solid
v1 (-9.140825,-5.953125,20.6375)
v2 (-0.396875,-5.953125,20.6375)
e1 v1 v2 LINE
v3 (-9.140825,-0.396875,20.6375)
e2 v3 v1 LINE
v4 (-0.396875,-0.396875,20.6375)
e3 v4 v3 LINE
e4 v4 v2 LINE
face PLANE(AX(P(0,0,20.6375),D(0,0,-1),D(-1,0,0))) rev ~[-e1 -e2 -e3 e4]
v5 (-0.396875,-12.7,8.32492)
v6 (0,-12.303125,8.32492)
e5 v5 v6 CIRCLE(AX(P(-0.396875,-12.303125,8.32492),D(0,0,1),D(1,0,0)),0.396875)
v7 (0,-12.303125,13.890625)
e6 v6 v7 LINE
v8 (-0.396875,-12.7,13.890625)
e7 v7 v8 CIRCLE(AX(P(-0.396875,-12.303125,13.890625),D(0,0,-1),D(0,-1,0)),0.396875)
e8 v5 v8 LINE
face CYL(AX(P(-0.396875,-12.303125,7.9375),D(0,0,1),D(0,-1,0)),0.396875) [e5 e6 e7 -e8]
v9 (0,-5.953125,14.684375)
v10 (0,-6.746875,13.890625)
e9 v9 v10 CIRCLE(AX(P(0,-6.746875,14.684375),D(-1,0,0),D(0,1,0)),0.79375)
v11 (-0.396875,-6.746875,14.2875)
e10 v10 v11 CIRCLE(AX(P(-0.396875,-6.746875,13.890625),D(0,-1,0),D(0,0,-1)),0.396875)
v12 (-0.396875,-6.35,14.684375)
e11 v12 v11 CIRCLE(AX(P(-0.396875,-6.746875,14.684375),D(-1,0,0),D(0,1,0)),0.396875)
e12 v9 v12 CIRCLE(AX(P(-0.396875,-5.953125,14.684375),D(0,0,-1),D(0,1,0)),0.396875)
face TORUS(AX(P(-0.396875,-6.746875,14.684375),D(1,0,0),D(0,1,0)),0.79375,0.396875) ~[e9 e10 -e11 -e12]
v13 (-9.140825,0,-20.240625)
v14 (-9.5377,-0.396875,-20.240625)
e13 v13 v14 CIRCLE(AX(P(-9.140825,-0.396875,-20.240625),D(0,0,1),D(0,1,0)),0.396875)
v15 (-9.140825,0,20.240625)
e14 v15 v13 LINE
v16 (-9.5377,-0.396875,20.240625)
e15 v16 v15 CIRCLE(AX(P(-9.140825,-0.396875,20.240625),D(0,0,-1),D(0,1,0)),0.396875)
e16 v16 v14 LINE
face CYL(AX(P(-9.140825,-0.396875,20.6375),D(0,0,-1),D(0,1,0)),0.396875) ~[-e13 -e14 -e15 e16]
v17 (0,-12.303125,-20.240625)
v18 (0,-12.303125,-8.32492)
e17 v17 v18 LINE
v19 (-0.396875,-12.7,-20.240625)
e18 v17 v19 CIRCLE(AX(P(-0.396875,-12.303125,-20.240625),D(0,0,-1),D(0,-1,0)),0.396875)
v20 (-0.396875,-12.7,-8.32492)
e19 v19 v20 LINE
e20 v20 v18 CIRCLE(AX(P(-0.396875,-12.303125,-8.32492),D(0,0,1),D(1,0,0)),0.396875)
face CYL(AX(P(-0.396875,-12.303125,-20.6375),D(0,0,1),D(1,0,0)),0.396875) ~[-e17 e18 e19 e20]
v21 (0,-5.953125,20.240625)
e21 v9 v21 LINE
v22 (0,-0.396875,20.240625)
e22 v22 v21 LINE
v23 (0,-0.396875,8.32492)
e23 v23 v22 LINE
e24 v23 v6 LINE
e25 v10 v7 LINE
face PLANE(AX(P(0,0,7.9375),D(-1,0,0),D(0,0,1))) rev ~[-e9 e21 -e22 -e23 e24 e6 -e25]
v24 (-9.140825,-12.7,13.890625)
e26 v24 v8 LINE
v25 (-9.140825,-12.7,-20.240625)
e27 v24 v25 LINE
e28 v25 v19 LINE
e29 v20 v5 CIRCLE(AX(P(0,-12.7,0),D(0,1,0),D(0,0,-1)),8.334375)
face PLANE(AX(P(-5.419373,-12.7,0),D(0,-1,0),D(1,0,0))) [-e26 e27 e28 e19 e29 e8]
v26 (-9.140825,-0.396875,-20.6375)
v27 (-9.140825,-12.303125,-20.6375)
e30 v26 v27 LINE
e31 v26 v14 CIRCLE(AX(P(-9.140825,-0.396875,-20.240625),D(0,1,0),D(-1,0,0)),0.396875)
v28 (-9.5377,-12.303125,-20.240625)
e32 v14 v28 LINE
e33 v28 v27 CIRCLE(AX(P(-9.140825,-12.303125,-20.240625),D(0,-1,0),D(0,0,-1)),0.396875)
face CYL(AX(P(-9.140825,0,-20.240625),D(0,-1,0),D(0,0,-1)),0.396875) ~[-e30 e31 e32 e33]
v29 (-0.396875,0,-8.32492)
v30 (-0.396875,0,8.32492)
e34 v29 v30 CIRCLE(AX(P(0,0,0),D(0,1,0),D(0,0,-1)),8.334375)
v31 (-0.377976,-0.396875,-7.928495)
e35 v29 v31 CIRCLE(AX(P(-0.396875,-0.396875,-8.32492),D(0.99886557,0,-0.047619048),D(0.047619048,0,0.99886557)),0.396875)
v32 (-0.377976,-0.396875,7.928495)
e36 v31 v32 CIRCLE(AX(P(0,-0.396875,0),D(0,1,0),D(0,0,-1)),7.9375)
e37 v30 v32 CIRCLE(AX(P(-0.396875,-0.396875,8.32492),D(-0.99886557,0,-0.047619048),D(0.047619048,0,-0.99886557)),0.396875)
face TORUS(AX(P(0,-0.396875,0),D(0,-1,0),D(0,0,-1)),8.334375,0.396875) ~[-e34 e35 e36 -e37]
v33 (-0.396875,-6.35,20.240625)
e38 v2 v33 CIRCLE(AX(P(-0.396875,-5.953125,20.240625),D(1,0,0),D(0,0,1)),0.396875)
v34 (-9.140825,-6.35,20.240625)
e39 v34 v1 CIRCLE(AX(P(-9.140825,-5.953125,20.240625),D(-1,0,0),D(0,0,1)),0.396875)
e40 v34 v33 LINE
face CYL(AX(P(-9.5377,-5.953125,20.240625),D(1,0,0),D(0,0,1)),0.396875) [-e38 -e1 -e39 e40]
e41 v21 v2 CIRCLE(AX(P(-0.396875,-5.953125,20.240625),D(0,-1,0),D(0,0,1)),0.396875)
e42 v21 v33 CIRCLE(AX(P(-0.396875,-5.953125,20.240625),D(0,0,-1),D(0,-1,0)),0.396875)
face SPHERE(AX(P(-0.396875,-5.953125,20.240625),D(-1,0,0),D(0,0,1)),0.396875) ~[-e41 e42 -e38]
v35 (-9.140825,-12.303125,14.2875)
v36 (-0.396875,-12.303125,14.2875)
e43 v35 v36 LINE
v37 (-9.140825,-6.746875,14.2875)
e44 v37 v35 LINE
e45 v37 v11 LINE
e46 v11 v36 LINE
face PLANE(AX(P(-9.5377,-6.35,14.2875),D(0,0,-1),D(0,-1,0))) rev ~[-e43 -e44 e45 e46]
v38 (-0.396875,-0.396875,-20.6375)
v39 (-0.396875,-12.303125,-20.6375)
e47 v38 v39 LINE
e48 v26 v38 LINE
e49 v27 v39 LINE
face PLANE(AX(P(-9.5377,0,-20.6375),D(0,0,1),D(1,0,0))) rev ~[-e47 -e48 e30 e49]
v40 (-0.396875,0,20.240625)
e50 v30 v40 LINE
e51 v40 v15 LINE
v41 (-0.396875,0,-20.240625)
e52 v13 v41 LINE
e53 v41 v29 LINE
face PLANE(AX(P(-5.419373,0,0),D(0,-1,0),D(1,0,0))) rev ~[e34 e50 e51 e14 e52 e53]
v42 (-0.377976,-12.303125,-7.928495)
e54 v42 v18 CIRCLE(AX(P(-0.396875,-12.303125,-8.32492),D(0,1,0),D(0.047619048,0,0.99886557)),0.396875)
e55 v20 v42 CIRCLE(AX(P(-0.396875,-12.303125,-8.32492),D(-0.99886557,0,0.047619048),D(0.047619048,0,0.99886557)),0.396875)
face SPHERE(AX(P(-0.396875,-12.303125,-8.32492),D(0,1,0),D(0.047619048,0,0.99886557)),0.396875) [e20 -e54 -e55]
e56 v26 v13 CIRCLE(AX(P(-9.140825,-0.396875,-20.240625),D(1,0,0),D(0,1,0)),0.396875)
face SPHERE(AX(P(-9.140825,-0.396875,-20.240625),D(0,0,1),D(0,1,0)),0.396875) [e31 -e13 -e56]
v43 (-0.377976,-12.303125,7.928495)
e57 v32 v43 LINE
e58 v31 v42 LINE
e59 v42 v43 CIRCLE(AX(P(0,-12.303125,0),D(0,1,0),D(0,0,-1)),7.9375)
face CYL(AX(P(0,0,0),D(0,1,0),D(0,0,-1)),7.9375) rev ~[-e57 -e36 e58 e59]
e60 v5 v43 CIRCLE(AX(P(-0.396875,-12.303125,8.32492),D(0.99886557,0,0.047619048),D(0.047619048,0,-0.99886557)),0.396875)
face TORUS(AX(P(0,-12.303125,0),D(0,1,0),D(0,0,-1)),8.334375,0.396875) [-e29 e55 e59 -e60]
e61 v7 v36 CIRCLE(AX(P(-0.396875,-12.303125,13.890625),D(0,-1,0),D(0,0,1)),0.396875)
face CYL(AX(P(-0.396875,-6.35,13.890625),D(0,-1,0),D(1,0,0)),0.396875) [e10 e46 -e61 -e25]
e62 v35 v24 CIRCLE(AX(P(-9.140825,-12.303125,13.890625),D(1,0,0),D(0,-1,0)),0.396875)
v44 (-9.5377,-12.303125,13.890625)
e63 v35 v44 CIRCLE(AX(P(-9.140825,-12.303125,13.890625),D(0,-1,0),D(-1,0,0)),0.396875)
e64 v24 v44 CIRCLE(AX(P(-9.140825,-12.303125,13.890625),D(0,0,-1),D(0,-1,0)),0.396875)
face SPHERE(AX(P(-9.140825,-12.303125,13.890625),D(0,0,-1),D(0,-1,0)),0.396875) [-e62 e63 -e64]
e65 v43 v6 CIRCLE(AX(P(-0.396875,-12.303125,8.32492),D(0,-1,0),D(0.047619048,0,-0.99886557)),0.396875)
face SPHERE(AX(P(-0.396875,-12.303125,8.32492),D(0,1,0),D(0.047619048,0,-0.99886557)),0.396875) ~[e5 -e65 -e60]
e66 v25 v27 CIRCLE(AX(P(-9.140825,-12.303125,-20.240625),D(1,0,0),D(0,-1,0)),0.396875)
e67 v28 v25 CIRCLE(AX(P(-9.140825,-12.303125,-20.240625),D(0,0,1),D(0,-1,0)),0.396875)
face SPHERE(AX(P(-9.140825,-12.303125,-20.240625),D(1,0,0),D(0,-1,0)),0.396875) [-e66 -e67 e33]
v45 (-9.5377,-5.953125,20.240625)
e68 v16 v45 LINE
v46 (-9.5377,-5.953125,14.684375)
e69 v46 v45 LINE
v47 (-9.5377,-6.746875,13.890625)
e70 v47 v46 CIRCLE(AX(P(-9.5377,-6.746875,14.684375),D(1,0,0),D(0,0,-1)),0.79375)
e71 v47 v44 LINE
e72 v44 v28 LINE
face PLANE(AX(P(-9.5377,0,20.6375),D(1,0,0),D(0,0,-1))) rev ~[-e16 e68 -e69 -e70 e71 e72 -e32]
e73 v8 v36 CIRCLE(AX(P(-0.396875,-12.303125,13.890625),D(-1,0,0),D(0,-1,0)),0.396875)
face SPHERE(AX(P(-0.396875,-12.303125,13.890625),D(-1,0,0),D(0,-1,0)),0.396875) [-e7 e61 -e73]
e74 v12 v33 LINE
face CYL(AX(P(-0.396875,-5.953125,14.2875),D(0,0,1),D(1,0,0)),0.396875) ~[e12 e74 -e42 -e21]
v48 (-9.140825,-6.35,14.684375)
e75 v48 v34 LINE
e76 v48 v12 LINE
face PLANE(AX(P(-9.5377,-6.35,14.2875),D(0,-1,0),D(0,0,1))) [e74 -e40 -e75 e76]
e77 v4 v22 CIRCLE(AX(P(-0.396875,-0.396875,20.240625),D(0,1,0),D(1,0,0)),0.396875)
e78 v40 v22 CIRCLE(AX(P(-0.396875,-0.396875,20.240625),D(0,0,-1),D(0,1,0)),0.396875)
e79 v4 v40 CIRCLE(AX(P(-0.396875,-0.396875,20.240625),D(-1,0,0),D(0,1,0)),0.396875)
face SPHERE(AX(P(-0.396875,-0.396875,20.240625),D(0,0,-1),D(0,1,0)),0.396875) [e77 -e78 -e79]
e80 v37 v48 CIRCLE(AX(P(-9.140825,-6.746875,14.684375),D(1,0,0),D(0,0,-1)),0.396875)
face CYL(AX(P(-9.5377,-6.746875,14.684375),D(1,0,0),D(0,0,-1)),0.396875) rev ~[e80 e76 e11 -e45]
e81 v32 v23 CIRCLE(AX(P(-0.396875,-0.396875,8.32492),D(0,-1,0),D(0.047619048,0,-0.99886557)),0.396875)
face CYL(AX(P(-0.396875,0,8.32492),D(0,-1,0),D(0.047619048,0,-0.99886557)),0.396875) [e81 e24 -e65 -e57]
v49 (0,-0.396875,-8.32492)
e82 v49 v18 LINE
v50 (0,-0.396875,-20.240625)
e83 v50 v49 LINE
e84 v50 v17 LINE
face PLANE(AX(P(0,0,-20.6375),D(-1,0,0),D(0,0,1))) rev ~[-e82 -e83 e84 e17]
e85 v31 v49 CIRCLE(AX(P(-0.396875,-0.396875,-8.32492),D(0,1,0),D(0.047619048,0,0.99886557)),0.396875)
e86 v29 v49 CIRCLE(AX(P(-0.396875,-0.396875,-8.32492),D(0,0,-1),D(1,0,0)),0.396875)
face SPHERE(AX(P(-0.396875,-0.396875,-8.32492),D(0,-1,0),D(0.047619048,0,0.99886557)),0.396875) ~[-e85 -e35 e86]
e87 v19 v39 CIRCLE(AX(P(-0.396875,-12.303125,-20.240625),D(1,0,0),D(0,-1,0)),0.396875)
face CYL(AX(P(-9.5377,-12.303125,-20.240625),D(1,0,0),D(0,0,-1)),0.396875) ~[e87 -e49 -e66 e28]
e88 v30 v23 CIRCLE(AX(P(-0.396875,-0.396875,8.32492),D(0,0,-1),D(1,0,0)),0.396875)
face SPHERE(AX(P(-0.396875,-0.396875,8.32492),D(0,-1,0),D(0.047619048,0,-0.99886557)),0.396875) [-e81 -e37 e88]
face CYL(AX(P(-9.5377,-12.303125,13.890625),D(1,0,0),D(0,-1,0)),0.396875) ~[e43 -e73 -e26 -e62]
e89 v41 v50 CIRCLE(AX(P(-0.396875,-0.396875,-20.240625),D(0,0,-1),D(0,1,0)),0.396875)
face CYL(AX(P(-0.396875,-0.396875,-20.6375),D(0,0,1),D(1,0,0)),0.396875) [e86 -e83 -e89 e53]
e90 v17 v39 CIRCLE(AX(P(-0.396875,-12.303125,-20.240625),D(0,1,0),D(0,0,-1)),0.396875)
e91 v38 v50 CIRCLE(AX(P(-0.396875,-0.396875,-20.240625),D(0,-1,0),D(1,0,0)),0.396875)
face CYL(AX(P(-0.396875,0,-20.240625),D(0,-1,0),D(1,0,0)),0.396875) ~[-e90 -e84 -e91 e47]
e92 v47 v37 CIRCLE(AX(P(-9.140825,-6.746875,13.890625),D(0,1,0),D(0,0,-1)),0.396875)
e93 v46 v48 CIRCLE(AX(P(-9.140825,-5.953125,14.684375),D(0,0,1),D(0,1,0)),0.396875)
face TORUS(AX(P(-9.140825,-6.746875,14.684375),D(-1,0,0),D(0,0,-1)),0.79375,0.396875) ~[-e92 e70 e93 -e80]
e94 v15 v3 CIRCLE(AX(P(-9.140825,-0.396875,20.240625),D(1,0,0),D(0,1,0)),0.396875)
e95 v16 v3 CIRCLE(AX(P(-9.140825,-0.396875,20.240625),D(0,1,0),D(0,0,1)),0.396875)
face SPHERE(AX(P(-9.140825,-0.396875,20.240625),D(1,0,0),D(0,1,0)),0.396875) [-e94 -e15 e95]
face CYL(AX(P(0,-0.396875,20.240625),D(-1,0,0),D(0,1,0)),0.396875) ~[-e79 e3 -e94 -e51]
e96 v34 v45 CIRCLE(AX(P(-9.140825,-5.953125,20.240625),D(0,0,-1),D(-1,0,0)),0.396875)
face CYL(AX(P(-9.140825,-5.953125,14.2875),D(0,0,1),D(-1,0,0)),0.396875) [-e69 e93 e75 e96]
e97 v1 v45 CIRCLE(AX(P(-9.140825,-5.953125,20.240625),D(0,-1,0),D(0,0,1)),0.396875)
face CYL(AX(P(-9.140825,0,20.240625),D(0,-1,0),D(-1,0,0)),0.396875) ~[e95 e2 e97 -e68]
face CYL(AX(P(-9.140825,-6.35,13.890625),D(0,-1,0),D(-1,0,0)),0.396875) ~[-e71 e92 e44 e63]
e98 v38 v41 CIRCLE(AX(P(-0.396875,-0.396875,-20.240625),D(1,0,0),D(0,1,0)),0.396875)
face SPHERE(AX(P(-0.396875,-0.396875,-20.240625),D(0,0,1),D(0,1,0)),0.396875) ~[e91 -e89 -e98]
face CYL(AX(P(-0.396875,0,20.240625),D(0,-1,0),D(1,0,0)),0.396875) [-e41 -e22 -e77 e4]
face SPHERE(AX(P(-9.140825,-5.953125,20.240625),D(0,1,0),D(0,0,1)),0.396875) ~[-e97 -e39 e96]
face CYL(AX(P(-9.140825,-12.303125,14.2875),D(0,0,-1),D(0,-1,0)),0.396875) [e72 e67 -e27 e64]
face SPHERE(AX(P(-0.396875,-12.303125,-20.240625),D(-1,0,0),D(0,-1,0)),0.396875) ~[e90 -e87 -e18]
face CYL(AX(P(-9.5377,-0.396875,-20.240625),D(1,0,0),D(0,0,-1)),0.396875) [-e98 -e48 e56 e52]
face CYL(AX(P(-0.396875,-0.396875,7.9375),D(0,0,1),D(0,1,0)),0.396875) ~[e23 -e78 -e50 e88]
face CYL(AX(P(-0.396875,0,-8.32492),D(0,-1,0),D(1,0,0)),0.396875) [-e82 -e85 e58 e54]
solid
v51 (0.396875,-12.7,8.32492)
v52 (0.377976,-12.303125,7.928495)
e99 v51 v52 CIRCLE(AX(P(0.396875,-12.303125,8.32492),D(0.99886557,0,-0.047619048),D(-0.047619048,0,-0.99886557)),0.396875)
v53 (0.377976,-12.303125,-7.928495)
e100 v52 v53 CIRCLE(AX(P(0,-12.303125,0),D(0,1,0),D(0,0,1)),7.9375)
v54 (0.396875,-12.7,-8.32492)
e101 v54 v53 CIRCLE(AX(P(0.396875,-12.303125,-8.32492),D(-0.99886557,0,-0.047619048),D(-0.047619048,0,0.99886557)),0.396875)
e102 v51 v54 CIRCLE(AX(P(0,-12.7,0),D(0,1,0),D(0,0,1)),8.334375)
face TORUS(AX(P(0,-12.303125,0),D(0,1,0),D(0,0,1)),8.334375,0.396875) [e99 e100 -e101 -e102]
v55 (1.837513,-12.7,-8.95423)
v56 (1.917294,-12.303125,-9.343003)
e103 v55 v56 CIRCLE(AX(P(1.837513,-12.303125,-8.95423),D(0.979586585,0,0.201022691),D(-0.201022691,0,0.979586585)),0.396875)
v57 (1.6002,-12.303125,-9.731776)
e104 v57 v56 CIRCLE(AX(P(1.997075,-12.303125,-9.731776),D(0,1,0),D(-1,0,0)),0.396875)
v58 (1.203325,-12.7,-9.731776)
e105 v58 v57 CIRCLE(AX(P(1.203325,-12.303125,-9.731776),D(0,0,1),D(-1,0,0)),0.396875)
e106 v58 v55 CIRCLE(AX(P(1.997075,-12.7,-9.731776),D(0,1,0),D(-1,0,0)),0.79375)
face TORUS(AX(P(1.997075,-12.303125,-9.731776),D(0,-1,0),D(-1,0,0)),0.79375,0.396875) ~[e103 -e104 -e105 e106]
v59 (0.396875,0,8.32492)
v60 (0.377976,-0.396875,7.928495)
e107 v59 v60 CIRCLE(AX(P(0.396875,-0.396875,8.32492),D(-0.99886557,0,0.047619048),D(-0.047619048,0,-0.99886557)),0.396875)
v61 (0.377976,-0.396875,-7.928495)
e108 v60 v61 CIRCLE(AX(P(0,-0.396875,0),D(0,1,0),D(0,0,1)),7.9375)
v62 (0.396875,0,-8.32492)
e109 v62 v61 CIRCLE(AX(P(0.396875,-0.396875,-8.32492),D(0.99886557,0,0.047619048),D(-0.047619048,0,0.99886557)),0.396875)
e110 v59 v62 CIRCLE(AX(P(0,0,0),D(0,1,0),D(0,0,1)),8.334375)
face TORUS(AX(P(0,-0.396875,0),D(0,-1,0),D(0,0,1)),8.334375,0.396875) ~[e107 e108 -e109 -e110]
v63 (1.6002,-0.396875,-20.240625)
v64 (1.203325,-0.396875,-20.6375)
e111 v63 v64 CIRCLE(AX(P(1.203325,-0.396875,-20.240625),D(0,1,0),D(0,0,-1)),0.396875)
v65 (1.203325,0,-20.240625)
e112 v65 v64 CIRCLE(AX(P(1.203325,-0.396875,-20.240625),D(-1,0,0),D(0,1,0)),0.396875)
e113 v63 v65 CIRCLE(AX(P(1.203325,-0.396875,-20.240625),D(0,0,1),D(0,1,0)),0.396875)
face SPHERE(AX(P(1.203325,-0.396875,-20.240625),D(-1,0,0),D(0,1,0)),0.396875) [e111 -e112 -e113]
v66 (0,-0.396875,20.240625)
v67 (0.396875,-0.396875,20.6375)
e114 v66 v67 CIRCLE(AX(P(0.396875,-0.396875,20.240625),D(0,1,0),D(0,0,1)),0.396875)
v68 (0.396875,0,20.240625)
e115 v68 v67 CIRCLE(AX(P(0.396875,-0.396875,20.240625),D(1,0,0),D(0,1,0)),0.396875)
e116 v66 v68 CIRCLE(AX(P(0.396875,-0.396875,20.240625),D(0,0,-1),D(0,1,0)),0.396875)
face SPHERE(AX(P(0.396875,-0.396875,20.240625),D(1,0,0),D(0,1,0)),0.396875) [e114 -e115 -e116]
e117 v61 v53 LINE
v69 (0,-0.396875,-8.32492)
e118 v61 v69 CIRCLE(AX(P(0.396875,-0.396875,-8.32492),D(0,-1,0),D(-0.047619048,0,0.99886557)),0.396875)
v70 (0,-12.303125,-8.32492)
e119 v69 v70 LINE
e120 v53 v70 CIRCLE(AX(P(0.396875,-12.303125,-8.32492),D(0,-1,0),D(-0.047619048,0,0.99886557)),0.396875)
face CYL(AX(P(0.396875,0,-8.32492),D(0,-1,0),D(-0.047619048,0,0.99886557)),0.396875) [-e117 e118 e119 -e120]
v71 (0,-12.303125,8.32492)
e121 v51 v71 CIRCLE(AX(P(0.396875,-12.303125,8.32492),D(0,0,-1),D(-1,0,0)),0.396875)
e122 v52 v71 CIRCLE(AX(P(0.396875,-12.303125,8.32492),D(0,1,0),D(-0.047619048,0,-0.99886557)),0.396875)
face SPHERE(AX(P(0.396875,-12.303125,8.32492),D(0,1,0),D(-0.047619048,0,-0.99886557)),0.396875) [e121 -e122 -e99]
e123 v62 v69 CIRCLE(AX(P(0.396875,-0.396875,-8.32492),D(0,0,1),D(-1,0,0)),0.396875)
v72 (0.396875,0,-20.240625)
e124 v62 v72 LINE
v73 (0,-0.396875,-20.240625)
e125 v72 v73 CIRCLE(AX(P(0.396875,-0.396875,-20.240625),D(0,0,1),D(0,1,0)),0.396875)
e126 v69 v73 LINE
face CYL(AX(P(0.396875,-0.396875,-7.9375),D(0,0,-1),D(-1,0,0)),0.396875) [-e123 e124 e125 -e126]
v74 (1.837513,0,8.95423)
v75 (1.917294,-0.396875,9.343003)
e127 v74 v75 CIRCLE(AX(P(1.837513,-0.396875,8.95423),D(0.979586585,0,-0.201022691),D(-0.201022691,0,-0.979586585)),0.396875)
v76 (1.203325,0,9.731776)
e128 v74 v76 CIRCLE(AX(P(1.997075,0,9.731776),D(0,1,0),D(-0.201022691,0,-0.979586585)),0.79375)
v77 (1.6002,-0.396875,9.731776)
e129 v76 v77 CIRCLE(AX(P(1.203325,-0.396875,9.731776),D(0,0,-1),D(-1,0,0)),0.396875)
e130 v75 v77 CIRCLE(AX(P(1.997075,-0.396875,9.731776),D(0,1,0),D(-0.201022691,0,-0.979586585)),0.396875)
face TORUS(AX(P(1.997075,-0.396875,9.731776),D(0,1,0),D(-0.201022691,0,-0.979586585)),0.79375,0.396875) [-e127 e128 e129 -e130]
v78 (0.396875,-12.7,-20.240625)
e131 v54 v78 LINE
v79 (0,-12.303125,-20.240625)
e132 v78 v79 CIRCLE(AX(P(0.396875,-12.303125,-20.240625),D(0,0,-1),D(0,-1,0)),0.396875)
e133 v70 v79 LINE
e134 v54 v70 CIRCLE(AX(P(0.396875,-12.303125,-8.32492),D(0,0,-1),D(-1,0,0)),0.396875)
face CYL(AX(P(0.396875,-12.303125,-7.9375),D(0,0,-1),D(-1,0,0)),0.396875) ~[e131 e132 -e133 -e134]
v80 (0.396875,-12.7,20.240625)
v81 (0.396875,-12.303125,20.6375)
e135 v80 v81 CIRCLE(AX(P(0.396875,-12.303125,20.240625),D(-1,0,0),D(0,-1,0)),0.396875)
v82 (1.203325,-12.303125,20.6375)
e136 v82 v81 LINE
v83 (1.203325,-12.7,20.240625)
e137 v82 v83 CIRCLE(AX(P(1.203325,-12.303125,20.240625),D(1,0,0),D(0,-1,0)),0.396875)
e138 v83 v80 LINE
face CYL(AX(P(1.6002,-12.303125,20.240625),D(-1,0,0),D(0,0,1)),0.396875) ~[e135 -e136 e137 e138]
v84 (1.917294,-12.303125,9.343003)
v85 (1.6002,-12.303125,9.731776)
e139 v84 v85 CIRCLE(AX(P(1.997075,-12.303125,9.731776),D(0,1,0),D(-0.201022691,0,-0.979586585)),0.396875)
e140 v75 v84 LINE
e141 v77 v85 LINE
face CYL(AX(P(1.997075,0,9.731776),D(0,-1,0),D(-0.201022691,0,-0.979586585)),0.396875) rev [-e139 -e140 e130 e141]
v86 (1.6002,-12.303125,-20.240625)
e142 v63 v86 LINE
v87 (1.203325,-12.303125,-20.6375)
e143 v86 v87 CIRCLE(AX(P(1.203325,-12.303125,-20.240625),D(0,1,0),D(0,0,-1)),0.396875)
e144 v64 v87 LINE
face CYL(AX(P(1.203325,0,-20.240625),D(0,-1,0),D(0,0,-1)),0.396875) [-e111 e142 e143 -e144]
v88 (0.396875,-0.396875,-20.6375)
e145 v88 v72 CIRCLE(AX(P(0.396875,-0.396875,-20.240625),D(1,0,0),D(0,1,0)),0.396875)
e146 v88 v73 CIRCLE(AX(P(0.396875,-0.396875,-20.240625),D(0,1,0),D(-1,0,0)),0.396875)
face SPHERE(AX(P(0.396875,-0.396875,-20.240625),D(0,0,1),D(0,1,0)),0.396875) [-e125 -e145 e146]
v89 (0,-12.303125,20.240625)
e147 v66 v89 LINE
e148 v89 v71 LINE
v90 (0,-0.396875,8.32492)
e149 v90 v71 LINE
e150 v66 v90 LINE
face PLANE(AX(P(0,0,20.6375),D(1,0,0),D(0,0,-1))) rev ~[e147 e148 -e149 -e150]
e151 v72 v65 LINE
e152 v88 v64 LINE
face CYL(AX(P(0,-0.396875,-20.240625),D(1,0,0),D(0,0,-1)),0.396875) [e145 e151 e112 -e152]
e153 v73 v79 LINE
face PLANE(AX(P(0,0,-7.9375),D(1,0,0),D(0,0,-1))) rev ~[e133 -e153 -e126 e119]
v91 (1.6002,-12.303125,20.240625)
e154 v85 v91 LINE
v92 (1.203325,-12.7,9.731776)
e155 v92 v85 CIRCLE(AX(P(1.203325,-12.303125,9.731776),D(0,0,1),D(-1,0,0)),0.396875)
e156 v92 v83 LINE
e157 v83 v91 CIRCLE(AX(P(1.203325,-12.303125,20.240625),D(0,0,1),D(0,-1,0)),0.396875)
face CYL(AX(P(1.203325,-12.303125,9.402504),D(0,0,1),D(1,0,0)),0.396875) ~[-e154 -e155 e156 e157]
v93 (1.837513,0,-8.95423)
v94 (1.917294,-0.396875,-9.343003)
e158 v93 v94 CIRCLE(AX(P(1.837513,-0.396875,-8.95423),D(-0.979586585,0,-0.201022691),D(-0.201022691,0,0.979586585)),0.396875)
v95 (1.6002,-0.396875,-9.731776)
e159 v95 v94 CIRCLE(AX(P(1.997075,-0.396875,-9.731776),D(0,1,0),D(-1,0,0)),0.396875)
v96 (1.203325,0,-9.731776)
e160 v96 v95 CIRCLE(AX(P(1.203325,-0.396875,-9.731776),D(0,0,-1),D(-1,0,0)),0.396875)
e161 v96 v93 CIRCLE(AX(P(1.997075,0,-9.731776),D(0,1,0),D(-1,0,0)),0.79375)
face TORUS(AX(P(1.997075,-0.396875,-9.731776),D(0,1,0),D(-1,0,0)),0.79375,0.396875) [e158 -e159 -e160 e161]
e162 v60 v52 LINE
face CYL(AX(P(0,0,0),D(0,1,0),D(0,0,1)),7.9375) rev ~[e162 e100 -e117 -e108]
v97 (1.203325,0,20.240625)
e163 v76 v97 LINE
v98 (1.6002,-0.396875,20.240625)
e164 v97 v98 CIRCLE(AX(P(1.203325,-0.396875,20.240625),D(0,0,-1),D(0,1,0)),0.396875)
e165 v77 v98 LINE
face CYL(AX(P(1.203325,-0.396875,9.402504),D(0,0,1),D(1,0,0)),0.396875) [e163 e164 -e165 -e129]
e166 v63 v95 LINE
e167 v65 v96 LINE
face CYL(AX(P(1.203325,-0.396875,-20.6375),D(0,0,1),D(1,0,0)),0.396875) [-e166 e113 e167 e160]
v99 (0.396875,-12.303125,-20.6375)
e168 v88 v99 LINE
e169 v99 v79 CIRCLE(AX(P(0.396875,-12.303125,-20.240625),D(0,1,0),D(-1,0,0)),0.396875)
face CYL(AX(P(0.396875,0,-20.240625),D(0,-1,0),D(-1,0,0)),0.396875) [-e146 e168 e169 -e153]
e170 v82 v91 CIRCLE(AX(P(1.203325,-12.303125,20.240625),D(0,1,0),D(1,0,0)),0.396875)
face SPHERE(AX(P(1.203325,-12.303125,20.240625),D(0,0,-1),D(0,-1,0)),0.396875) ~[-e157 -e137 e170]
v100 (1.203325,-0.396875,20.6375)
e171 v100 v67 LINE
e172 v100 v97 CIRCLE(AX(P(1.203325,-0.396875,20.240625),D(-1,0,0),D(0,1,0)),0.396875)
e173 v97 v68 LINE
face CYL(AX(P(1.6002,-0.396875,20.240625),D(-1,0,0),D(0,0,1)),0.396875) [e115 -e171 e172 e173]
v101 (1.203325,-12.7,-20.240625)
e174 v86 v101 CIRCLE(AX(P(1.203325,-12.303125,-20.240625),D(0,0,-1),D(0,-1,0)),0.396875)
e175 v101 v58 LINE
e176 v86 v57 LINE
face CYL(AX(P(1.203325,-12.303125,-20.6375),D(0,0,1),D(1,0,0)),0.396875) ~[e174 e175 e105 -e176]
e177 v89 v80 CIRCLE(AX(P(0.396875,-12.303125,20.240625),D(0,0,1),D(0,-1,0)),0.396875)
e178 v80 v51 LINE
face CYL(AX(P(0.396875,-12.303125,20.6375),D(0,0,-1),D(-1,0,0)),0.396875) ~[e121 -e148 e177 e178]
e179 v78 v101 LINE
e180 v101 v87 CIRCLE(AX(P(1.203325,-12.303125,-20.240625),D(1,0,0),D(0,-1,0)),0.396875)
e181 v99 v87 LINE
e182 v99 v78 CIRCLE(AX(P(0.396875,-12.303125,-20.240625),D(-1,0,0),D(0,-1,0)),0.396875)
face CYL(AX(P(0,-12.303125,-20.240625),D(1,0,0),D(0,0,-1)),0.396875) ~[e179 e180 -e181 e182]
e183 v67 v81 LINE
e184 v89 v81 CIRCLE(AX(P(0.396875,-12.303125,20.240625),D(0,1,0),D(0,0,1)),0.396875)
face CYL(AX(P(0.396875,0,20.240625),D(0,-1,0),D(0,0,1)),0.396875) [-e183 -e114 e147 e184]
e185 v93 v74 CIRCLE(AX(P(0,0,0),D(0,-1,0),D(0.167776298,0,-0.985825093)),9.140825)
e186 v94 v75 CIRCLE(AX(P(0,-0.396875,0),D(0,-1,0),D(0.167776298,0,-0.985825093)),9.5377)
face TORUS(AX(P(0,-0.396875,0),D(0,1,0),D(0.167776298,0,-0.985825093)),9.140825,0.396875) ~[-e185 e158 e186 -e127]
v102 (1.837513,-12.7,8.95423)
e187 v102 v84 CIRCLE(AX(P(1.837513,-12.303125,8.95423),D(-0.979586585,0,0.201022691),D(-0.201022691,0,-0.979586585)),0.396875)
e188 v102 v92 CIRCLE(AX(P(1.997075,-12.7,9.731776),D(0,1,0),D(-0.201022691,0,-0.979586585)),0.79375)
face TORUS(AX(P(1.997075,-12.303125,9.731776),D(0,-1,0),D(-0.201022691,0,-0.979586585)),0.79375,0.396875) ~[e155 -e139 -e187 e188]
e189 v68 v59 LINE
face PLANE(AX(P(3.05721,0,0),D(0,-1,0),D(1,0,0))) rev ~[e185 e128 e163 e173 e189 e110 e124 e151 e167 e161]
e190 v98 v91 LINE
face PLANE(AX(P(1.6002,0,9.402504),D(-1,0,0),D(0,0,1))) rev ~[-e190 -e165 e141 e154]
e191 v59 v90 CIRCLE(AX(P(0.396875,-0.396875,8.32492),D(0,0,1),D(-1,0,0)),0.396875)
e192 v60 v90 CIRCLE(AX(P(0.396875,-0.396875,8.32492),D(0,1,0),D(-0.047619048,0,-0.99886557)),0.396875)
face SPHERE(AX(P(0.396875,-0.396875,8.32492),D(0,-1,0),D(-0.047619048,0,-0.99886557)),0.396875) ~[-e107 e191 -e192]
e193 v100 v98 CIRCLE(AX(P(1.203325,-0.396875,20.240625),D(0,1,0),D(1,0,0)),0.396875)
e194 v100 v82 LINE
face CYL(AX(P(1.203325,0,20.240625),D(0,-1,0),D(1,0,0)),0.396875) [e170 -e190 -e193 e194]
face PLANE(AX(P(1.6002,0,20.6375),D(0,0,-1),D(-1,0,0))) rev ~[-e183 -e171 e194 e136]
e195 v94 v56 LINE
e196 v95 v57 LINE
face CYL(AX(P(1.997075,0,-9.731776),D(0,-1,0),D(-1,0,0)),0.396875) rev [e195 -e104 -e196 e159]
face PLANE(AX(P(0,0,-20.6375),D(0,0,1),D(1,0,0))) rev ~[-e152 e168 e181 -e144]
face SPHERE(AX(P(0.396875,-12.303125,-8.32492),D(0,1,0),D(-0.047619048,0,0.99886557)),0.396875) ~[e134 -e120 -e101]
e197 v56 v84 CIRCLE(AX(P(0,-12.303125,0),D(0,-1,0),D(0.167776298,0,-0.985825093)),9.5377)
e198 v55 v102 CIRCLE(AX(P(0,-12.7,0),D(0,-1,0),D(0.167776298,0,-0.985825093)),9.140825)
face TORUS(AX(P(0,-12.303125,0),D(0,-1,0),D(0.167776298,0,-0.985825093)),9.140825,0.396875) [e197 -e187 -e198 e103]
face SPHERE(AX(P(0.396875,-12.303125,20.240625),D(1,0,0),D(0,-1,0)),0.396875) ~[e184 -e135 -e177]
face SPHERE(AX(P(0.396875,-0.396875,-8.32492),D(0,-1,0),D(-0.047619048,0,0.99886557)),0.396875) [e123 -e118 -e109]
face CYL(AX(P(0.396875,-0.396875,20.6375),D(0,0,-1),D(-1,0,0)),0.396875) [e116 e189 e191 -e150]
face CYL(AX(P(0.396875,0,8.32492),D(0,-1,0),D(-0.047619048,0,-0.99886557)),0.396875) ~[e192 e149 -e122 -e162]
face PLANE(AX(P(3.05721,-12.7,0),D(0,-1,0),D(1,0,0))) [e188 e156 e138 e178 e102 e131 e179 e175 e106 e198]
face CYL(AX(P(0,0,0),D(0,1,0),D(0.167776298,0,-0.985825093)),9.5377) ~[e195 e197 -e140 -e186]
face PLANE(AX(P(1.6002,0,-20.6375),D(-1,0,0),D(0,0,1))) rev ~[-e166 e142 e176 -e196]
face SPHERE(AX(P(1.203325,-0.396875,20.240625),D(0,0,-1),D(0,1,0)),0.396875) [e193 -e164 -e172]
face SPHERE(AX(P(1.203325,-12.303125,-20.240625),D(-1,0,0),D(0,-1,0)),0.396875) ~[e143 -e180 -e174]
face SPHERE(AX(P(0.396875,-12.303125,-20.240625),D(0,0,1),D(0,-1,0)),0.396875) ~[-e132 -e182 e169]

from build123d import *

# Parameters (mm, degrees)
F1_DEPTH = 12.7
F2_R     = 0.396875
F3_DEPTH = 12.7
F4_W     = 6.35
F4_H     = 6.35
F5_DEPTH = 25.4
F6_R     = 0.396875


with BuildPart() as f1:
    # F0 (on Front) → F1 (new body)
    with BuildSketch(Plane.XZ):
        with BuildLine():
            ThreePointArc((0, 7.9375), (7.9375, 0), (0, -7.9375))
            Line((0, -7.9375), (0, -20.6375))
            Line((0, -20.6375), (1.6002, -20.6375))
            Line((1.6002, -20.6375), (1.6002, -9.4025039883))
            ThreePointArc((1.6002, -9.4025039883), (9.5377, 0), (1.6002, 9.4025039883))
            Line((1.6002, 9.4025039883), (1.6002, 20.6375))
            Line((1.6002, 20.6375), (0, 20.6375))
            Line((0, 20.6375), (0, 7.9375))
        make_face()
    extrude(amount=F1_DEPTH)

    # F2
    f2_edges = [f1.edges().sort_by_distance(p)[0] for p in [
        (1.6002, -6.35, 9.402504),
        (1.6002, -6.35, -9.402504),
        (0, -6.35, 7.9375),
        (0, -6.35, -7.9375),
        (7.9375, 0, 0),
        (0, 0, -14.2875),
        (0.8001, 0, -20.6375),
        (1.6002, 0, -15.020002),
        (9.5377, 0, 0),
        (1.6002, 0, 15.020002),
        (0.8001, 0, 20.6375),
        (0, 0, 14.2875),
        (7.9375, -12.7, 0),
        (0, -12.7, -14.2875),
        (0.8001, -12.7, -20.6375),
        (1.6002, -12.7, -15.020002),
        (9.5377, -12.7, 0),
        (1.6002, -12.7, 15.020002),
        (0.8001, -12.7, 20.6375),
        (0, -12.7, 14.2875),
        (0, -6.35, -20.6375),
        (1.6002, -6.35, -20.6375),
        (1.6002, -6.35, 20.6375),
        (0, -6.35, 20.6375),
    ]]
    fillet(f2_edges, radius=F2_R)


with BuildPart() as f3:
    # F0 (on Front) → F3 (new body)
    with BuildSketch(Plane.XZ):
        with BuildLine():
            Line((0, -20.6375), (0, -7.9375))
            ThreePointArc((0, -7.9375), (-7.9375, 0), (0, 7.9375))
            Line((0, 7.9375), (0, 20.6375))
            Line((0, 20.6375), (-1.6002, 20.6375))
            Line((-1.6002, 20.6375), (-9.5377, 20.6375))
            Line((-9.5377, 20.6375), (-9.5377, 0))
            Line((-9.5377, 0), (-9.5377, -20.6375))
            Line((-9.5377, -20.6375), (-1.6002, -20.6375))
            Line((-1.6002, -20.6375), (0, -20.6375))
        make_face()
    extrude(amount=F3_DEPTH)

    # F4 (on face) → F5 (cut)
    with BuildSketch(Plane(origin=(-9.5377, 0, 0), x_dir=(0, -1, 0), z_dir=(-1, 0, 0))):
        with Locations((9.525, 17.4625)):
            Rectangle(F4_W, F4_H)
    extrude(amount=-F5_DEPTH, mode=Mode.SUBTRACT)

    # F6
    f6_edges = [f3.edges().sort_by_distance(p)[0] for p in [
        (0, -6.35, -7.9375),
        (0, -6.35, 7.9375),
        (-7.9375, 0, 0),
        (-7.9375, -12.7, 0),
        (0, 0, -14.2875),
        (0, 0, 14.2875),
        (-4.76885, 0, 20.6375),
        (-9.5377, 0, 0),
        (-4.76885, 0, -20.6375),
        (-4.76885, -12.7, -20.6375),
        (-9.5377, -12.7, -3.175),
        (-4.76885, -12.7, 14.2875),
        (0, -12.7, 11.1125),
        (0, -12.7, -14.2875),
        (-9.5377, -3.175, 20.6375),
        (-4.76885, -6.35, 20.6375),
        (0, -3.175, 20.6375),
        (-9.5377, -6.35, -20.6375),
        (0, -6.35, -20.6375),
        (-9.5377, -6.35, 17.4625),
        (-4.76885, -6.35, 14.2875),
        (0, -6.35, 17.4625),
        (-9.5377, -9.525, 14.2875),
        (0, -9.525, 14.2875),
    ]]
    fillet(f6_edges, radius=F6_R)


solid = Compound([f1.part, f3.part])
